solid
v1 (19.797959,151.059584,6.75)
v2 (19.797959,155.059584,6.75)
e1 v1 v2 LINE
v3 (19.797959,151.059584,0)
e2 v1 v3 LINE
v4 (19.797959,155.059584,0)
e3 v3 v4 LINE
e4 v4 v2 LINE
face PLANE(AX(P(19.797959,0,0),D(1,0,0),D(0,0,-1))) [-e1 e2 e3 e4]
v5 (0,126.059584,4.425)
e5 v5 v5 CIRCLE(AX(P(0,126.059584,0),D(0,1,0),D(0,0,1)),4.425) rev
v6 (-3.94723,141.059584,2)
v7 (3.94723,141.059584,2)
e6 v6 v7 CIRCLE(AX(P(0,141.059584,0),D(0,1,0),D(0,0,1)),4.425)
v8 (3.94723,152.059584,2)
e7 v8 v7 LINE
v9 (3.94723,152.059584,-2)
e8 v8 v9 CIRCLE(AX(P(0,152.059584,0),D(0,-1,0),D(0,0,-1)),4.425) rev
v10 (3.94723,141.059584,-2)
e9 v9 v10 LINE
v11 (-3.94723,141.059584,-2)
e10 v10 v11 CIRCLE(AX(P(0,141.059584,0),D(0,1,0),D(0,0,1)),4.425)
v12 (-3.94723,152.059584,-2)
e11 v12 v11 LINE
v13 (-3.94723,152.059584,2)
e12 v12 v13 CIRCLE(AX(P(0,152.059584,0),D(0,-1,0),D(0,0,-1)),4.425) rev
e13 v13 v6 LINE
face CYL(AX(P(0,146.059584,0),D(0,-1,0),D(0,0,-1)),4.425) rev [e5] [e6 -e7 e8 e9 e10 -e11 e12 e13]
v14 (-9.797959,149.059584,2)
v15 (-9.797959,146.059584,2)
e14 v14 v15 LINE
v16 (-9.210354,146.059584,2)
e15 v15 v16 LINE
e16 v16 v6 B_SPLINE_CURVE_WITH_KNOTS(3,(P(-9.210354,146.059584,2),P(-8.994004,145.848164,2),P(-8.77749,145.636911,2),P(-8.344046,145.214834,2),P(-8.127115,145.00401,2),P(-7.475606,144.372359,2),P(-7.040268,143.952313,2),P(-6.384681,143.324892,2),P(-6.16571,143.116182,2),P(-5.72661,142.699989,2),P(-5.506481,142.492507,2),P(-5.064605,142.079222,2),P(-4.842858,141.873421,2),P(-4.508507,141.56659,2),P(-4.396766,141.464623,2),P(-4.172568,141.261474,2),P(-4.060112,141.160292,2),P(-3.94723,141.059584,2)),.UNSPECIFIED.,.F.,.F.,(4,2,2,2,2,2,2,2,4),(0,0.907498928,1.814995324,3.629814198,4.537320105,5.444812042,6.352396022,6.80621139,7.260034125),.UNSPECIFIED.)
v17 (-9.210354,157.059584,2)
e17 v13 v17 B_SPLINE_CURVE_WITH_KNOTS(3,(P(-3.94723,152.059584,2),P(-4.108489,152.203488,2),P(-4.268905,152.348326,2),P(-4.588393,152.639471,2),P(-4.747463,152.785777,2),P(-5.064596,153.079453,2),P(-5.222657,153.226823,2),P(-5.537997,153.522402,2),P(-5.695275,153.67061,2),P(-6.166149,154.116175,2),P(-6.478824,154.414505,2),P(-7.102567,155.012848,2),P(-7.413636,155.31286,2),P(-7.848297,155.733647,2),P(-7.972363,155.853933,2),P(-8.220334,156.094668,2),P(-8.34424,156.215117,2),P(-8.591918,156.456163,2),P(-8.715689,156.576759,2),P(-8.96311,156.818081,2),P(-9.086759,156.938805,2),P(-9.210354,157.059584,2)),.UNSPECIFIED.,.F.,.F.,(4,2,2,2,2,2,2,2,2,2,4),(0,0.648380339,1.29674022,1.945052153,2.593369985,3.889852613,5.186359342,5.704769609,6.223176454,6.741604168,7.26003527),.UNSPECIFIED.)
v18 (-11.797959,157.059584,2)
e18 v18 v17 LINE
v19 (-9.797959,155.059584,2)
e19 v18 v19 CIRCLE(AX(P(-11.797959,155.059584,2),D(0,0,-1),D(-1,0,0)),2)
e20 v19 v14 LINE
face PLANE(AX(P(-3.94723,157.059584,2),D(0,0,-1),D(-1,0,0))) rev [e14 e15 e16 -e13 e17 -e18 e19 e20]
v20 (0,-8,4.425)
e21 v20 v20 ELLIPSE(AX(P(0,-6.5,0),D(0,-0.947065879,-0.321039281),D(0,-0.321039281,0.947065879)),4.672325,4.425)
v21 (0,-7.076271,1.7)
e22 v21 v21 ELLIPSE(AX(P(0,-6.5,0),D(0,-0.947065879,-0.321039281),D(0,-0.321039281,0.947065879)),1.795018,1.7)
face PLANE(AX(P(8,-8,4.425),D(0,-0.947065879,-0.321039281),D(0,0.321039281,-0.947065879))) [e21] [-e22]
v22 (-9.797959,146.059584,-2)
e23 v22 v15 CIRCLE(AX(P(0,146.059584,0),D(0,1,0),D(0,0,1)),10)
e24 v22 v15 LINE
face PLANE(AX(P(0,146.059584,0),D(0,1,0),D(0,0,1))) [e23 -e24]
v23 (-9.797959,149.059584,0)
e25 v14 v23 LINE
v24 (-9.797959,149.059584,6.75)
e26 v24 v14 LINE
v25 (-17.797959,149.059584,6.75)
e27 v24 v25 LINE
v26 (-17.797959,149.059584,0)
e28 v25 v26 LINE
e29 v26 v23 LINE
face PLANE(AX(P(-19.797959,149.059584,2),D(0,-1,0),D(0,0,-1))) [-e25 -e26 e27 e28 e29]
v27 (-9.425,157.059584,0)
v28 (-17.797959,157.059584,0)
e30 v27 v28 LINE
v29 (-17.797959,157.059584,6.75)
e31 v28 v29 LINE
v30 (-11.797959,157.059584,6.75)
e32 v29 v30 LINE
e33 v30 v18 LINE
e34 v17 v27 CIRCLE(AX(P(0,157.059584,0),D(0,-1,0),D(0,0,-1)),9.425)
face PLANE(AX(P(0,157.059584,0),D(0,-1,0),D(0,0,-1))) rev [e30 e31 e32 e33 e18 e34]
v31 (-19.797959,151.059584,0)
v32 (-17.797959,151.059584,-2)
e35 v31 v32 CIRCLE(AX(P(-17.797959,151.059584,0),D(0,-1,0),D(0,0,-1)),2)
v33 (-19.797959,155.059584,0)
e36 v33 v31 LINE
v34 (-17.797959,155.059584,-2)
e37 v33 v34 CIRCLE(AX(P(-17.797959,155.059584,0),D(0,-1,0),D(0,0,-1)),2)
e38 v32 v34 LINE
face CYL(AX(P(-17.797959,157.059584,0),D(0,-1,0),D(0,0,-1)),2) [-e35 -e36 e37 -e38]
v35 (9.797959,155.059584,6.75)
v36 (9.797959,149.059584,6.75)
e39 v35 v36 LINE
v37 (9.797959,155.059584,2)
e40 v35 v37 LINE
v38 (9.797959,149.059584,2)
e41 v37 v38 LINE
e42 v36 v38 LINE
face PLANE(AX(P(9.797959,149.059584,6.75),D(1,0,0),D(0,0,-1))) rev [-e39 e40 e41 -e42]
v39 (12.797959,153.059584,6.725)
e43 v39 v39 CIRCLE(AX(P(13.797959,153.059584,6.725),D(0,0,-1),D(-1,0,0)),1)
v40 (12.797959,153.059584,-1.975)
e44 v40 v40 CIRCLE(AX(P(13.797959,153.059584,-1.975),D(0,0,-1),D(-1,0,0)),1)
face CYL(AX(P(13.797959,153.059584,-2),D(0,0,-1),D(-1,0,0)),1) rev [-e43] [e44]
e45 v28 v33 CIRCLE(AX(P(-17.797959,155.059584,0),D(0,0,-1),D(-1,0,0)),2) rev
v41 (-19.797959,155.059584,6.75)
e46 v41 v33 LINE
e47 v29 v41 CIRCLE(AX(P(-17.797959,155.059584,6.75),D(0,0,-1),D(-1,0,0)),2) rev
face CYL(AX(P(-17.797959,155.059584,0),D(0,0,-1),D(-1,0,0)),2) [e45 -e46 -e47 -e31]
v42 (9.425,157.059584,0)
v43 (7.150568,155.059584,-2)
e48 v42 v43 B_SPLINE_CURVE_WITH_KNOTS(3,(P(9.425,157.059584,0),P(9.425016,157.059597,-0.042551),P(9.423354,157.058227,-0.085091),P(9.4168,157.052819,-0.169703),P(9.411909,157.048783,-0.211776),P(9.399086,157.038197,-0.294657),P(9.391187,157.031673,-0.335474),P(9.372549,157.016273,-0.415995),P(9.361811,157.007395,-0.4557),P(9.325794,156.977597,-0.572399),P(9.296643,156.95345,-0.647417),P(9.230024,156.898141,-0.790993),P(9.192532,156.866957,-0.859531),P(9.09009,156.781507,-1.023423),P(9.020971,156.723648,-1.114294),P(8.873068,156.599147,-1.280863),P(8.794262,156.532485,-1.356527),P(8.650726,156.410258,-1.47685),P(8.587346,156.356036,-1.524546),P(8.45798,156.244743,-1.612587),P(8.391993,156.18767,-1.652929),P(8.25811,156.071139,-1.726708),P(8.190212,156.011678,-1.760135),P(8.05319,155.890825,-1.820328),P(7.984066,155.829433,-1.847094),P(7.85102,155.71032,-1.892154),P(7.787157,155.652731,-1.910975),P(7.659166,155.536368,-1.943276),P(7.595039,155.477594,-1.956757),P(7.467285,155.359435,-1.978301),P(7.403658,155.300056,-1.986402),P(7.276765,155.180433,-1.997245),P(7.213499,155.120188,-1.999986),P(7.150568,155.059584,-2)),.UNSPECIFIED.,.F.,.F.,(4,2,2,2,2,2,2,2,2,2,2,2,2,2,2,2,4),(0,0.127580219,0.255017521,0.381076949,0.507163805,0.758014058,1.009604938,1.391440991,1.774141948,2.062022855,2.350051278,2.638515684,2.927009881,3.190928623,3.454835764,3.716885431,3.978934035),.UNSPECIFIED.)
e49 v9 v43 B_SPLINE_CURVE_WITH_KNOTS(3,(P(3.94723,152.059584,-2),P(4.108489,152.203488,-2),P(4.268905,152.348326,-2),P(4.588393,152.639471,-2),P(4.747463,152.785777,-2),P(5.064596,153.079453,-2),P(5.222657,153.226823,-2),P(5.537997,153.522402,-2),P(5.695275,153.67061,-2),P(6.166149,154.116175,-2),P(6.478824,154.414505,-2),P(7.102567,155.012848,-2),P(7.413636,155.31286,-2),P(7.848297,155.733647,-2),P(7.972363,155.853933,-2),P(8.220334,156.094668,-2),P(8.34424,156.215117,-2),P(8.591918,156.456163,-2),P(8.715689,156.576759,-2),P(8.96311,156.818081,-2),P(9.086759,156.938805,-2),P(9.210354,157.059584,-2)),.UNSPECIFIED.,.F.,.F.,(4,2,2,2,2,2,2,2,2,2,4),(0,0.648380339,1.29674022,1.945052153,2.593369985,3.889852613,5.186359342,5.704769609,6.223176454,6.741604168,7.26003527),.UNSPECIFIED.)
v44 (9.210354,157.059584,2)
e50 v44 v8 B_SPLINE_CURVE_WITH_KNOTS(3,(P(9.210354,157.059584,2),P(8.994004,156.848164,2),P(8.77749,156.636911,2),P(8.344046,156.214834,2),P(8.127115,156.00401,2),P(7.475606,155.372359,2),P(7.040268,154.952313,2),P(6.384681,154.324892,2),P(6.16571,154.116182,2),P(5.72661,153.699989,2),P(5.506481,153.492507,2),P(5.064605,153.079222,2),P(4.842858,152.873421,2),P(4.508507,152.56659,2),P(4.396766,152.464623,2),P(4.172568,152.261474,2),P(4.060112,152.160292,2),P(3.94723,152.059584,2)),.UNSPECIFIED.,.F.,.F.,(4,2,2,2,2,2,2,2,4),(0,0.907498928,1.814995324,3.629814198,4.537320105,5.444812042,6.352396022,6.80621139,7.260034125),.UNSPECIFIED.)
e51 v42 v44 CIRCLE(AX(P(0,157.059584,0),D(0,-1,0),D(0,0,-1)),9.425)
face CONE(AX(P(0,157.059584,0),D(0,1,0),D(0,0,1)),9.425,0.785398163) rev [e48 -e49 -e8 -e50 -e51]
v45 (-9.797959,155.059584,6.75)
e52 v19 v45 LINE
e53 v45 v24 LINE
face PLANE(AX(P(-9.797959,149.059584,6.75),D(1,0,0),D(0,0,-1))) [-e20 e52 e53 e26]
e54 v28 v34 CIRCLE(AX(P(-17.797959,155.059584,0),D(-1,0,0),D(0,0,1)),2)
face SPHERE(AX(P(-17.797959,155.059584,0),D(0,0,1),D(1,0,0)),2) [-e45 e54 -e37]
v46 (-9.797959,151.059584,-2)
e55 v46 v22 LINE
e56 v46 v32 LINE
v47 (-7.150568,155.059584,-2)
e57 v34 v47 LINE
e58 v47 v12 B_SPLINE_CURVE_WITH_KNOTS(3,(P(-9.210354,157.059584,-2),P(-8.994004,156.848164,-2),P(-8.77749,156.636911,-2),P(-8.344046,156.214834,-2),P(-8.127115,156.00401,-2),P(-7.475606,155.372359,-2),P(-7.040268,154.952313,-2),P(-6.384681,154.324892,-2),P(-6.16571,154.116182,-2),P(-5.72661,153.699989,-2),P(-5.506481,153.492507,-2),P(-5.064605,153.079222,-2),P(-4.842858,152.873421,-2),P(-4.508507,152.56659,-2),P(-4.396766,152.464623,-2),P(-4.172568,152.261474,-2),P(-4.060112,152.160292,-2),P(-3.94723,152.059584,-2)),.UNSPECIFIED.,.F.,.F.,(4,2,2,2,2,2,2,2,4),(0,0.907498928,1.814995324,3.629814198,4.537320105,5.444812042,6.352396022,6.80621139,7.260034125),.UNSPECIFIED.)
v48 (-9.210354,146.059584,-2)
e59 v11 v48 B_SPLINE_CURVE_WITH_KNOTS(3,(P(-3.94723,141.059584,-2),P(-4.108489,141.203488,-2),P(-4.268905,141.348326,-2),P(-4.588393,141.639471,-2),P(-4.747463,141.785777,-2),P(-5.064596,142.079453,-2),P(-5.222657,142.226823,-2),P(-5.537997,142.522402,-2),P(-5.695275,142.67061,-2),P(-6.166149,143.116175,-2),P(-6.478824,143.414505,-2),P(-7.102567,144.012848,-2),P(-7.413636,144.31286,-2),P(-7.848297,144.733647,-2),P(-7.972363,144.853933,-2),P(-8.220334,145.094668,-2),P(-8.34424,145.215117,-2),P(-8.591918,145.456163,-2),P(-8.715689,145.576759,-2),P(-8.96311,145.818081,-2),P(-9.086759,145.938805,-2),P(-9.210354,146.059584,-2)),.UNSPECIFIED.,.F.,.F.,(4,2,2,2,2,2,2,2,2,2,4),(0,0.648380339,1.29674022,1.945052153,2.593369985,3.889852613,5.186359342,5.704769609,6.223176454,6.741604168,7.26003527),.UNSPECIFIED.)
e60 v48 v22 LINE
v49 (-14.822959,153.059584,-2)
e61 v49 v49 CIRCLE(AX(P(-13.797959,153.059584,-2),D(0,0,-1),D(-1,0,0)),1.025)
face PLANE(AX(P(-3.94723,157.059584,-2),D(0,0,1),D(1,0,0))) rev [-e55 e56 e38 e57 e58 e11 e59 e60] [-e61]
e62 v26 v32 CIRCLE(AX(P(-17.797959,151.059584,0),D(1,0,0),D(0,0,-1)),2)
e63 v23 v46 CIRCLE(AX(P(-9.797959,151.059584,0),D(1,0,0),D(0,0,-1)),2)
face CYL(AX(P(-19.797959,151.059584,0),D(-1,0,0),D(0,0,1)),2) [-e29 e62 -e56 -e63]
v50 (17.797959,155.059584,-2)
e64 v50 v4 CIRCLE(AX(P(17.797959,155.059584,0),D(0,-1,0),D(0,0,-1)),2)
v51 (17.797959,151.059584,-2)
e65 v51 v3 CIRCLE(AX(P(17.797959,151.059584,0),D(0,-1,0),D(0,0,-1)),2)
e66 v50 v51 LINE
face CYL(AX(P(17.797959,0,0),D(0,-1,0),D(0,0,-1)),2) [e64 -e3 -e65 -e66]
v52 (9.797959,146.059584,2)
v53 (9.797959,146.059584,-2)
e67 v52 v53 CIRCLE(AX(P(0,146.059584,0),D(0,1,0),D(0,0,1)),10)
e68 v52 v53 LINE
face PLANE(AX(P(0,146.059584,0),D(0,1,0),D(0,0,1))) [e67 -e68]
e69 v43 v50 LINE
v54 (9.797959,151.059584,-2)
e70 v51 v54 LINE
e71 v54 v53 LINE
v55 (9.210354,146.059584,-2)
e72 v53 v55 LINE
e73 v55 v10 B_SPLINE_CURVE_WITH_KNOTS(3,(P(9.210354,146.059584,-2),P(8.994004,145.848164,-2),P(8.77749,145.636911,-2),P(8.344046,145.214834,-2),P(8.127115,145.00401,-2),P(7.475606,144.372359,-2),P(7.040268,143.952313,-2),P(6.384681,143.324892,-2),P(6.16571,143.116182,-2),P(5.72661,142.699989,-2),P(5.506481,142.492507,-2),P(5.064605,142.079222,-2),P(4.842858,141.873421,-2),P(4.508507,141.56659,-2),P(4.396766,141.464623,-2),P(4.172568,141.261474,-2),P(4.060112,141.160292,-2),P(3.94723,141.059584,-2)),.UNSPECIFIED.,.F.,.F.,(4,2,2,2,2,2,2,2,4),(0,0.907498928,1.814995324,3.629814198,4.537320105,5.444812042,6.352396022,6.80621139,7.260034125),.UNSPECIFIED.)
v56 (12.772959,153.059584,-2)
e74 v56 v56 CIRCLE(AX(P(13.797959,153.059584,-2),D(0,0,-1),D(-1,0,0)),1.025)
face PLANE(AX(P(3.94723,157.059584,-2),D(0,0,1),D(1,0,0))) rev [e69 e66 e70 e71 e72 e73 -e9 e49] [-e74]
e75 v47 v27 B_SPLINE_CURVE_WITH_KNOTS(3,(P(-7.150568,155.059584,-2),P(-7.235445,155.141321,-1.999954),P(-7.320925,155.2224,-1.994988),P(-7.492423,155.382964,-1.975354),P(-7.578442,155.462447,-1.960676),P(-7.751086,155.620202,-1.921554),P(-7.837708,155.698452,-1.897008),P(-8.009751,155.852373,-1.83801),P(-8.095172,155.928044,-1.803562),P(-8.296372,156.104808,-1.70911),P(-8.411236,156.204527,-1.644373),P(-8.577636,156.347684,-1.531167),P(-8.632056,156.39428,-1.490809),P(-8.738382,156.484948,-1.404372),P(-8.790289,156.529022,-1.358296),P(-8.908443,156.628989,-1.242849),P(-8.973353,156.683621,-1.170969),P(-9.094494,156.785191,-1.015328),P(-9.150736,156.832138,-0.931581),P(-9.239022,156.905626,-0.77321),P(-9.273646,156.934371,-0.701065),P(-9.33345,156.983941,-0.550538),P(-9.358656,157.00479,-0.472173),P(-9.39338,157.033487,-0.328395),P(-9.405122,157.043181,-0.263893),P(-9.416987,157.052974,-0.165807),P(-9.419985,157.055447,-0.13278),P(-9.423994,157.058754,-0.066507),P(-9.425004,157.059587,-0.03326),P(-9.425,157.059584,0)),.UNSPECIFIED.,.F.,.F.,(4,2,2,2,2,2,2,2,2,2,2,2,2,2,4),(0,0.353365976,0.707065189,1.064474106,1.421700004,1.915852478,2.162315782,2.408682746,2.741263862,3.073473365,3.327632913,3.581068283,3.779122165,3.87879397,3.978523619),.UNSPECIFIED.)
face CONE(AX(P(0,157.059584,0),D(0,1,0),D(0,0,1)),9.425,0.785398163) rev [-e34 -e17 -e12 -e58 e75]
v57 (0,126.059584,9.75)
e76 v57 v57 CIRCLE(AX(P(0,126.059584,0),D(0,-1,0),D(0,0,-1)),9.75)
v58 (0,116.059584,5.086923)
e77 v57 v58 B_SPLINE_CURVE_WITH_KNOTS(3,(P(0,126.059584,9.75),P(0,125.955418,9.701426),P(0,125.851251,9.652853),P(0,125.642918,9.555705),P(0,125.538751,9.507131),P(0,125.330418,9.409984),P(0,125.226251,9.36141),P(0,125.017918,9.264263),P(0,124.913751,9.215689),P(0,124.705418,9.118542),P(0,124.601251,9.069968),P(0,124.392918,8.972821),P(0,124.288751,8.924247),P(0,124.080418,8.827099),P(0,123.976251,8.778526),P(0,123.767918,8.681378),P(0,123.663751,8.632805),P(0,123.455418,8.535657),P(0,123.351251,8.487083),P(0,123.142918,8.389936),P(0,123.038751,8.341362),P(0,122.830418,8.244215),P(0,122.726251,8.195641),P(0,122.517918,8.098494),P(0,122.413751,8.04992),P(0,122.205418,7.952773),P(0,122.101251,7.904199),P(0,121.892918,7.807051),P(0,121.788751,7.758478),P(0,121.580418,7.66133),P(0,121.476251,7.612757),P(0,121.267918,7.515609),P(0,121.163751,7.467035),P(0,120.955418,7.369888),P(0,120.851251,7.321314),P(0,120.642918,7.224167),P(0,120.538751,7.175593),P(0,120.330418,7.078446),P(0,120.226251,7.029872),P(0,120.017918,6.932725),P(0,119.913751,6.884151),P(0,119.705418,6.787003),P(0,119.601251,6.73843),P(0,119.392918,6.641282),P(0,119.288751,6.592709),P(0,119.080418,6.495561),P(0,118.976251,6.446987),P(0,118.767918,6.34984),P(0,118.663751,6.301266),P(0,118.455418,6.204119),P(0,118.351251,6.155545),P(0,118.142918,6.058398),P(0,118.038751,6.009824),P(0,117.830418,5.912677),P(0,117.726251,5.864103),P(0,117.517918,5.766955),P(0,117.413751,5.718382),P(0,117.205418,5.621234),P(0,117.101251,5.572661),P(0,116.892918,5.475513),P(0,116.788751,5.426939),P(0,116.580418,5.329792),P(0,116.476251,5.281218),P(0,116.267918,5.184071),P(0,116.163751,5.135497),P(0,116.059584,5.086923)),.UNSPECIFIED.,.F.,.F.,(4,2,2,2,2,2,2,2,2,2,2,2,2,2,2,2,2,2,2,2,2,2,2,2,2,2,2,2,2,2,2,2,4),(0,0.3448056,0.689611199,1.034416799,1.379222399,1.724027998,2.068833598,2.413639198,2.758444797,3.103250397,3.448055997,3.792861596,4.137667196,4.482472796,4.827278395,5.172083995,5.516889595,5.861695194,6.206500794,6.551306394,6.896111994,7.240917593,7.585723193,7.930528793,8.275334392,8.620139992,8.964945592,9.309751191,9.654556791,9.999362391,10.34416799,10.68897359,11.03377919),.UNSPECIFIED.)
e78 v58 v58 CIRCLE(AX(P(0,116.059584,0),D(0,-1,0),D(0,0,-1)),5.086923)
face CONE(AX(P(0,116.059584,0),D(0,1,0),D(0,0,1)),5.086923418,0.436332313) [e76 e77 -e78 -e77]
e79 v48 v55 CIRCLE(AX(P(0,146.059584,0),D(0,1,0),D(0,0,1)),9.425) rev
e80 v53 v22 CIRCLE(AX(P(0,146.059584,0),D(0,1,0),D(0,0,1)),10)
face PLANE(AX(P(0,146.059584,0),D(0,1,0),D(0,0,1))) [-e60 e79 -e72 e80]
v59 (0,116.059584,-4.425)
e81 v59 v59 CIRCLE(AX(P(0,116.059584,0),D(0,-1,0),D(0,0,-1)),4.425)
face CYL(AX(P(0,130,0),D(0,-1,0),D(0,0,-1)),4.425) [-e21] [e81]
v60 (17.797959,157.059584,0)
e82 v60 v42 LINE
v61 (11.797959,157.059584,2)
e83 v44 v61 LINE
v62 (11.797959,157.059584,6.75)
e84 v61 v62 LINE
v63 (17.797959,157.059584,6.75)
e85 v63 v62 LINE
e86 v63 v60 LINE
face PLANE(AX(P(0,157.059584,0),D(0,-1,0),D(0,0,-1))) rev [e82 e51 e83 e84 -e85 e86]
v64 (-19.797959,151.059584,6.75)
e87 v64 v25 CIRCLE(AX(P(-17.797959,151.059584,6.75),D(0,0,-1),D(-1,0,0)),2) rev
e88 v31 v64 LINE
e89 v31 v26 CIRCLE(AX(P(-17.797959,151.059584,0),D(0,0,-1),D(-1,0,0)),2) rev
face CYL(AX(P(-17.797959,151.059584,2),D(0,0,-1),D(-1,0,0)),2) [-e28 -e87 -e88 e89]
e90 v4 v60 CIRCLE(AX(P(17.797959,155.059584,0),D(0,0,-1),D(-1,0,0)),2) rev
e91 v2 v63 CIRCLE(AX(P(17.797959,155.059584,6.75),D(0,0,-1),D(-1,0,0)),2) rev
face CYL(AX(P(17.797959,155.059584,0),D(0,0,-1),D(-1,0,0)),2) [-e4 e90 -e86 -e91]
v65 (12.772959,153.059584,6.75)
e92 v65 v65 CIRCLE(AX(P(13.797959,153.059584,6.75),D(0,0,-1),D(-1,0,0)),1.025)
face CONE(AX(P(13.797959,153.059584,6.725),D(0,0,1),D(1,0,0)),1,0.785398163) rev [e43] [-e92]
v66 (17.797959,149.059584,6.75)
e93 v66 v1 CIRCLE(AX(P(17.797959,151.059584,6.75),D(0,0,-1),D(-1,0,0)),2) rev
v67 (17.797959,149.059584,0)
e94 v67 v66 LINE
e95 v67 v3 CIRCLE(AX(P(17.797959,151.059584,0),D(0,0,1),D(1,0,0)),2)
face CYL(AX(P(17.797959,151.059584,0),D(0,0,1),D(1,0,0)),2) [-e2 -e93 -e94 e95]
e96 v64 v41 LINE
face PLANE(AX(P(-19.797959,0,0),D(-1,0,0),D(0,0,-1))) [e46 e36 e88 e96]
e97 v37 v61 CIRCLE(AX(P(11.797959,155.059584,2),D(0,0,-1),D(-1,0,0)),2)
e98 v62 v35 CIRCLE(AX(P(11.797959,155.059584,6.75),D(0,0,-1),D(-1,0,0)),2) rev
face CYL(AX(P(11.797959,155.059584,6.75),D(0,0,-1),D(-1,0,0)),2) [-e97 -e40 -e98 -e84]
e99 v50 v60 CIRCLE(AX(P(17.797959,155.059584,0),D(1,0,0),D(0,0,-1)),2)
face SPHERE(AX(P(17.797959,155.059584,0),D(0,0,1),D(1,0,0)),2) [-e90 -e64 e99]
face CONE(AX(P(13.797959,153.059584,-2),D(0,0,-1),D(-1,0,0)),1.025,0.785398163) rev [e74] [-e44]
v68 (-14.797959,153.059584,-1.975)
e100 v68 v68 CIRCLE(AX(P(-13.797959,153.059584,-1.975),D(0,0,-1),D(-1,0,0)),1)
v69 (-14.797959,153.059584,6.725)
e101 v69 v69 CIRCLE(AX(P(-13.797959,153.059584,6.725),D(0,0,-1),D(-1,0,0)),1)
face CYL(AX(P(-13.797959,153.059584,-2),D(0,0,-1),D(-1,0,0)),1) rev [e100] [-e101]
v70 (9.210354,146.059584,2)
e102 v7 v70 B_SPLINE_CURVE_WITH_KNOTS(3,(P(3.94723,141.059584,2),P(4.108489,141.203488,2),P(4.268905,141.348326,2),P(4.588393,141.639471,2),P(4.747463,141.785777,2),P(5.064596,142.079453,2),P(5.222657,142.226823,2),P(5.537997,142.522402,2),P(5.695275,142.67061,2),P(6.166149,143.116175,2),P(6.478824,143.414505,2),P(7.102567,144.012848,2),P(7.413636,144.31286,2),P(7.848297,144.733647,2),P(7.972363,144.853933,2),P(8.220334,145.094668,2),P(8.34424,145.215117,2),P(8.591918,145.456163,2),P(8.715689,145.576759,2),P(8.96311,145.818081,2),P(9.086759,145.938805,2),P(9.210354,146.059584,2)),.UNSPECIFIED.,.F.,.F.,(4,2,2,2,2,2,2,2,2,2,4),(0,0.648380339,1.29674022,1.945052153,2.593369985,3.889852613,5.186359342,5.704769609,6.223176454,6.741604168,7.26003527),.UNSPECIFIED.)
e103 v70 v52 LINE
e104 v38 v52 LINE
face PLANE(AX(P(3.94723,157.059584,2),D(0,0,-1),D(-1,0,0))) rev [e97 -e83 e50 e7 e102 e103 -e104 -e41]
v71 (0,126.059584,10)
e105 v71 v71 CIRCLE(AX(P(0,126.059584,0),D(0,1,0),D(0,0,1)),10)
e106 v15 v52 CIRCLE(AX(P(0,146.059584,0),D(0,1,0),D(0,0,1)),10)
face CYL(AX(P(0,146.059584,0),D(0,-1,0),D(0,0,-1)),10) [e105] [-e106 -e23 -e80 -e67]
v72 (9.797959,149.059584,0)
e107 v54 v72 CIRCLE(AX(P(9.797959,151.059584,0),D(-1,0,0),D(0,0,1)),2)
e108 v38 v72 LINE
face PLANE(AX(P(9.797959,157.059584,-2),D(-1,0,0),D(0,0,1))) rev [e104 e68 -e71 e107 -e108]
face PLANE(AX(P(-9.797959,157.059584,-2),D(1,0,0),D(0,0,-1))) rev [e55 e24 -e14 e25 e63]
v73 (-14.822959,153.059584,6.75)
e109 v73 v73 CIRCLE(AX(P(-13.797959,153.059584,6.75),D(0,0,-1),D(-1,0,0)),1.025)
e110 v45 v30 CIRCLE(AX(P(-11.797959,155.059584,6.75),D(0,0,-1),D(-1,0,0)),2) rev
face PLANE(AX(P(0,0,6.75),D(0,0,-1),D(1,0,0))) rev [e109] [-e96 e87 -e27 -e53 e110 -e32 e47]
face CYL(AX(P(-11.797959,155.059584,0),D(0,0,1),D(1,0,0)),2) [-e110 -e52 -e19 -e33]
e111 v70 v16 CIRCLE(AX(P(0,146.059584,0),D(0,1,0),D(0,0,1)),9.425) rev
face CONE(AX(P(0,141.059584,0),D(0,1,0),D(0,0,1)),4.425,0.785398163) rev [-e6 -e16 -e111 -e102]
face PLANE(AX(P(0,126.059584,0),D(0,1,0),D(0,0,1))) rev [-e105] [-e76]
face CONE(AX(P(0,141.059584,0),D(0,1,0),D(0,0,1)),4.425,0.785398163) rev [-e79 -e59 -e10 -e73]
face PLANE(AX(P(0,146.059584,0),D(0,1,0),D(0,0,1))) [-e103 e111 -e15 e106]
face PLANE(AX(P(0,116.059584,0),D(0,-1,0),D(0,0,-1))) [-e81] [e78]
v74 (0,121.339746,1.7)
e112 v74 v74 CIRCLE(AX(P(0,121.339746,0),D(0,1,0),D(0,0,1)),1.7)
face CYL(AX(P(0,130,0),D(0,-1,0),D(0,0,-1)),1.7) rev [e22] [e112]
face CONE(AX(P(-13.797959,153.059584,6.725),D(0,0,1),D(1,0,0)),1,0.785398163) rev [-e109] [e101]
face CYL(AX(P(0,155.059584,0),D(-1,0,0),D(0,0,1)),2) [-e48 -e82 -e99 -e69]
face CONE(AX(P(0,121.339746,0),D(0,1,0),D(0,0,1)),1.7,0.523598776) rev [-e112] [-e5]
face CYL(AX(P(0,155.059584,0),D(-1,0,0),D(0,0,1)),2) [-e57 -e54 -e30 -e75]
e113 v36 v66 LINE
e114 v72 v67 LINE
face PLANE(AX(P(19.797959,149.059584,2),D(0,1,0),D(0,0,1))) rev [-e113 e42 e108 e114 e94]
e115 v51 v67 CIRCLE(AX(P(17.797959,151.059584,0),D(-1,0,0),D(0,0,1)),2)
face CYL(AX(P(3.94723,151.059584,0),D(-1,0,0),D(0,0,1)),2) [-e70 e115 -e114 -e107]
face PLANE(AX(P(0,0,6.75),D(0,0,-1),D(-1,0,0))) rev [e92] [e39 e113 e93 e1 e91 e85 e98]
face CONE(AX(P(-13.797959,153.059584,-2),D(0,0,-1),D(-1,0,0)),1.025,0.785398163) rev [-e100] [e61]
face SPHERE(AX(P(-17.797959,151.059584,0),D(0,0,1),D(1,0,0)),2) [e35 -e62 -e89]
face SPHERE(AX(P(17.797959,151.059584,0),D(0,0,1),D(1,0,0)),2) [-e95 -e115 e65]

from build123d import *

# Parameters (mm, degrees)
SKETCH1_R                      = 4.425000000000001
SKETCH1_R_2                    = 1.7
BOSS_EXTRUDE1_DEPTH            = 130
CHAMFER1_SIZE                  = 8.660254038
CHAMFER1_SIZE_2                = 5
SKETCH2_R                      = 10
SKETCH2_R_2                    = 4.425000000000001
BOSS_EXTRUDE2_DEPTH            = 20
BOSS_EXTRUDE5_DEPTH            = 11
BOSS_EXTRUDE6_DEPTH            = 10
SKETCH13_W                     = 10.000000000000002
SKETCH13_H                     = 8
BOSS_EXTRUDE7_DEPTH            = 4.75
FILLET1_R                      = 2
FILLET1_OF_MIRROR1_R           = 2
CHAMFER4_SIZE                  = 5
CHAMFER2_SIZE                  = 5
BOSS_EXTRUDE3_START            = 10
SKETCH7_R                      = 9.75
SKETCH7_R_2                    = 4.425000000000001
BOSS_EXTRUDE3_DEPTH            = 10
CHAMFER3_SIZE2                 = 4.663076582
CHAMFER3_SIZE                  = 10
BOSS_EXTRUDE4_START            = 8
SKETCH8_R                      = 4.425000000000001
SKETCH8_R_2                    = 1.7
BOSS_EXTRUDE4_DEPTH            = 8
CUT_EXTRUDE1_DEPTH             = 8
CUT_EXTRUDE1_DEPTH_BACK        = 8
FILLET2_R                      = 2
F_2_0MM_DOWEL_HOLE1_AT_2_COUNT = 2
F_2_0MM_DOWEL_HOLE1_AT_2_PITCH = 27.595917942265427


# Some blends are built 0.0001 mm under size
with BuildPart() as part:
    # Sketch1 → Boss-Extrude1 (new body)
    with BuildSketch(Plane(origin=(0, 0, 0), x_dir=(1, 0, 0), z_dir=(0, 1, 0))):
        with Locations(Location((0, 0, 0), (0, 0, 270))):
            Circle(SKETCH1_R)
        with Locations(Location((0, 0, 0), (0, 0, 270))):
            Circle(SKETCH1_R_2, mode=Mode.SUBTRACT)
    extrude(amount=BOSS_EXTRUDE1_DEPTH)

    # Chamfer1
    # the kernel refuses this chamfer: 8.660254038, 5 mm, written as the material it takes off along each edge
    with BuildSketch(Plane(origin=(0, 130, 0), x_dir=(-1.8e-16, 0, 1), z_dir=(-1, 0, -1.8e-16))) as chamfer1_piece_1:
        Polygon((1.7, -CHAMFER1_SIZE), (1.7 + CHAMFER1_SIZE_2, 0), (1.7, 0), align=None)
    revolve(axis=Axis((0, 130, 0), (0, 1, 0)), mode=Mode.SUBTRACT)



with BuildPart() as body_2:
    # Sketch2 → Boss-Extrude2 (new body)
    with BuildSketch(Plane(origin=(0, 126.05958441278065, 0), x_dir=(1, 0, 0), z_dir=(0, 1, 0))):
        with Locations(Location((0, 0, 0), (0, 0, 270))):
            Circle(SKETCH2_R)
        with Locations(Location((0, 0, 0), (0, 0, 270))):
            Circle(SKETCH2_R_2, mode=Mode.SUBTRACT)
    extrude(amount=BOSS_EXTRUDE2_DEPTH)

    # Sketch10 → Boss-Extrude5 (add)
    with BuildSketch(Plane(origin=(0, 146.05958441278062, 0), x_dir=(1, 0, 0), z_dir=(0, 1, 0))):
        with BuildLine():
            Line((-3.9472300414341213, -1.9999999999999991), (-9.797958971132713, -1.9999999999999987))
            Line((-9.797958971132713, -1.9999999999999987), (-9.797958971132713, 1.9999999999999987))
            Line((-9.797958971132713, 1.9999999999999987), (-3.9472300414341213, 2.0000000000000004))
            ThreePointArc((-3.9472300414341213, 2.0000000000000004), (-4.425000000000002, 1.42e-15), (-3.9472300414341213, -1.9999999999999991))
        make_face()
        with BuildLine():
            Line((3.9472300414341213, 2.0000000000000004), (9.797958971132713, 1.9999999999999987))
            Line((9.797958971132713, 1.9999999999999987), (9.797958971132713, -1.9999999999999987))
            Line((9.797958971132713, -1.9999999999999987), (3.9472300414341213, -1.9999999999999991))
            ThreePointArc((3.9472300414341213, -1.9999999999999991), (4.425000000000002, 4.9e-16), (3.9472300414341213, 2.0000000000000004))
        make_face()
    boss_extrude5 = extrude(amount=BOSS_EXTRUDE5_DEPTH)

    # Sketch11 → Boss-Extrude6 (add)
    with BuildSketch(Plane(origin=(9.797958971132713, 0, 0), x_dir=(0, 0, -1), z_dir=(1, 0, 0))):
        Polygon((-2.0000000000000004, 157.05958441278065), (2.0000000000000004, 157.05958441278065), (2.0000000000000013, 149.05958441278065), (-1.9999999999999996, 149.05958441278065), align=None)
    boss_extrude6 = extrude(amount=BOSS_EXTRUDE6_DEPTH)

    # Sketch13 → Boss-Extrude7 (add)
    with BuildSketch(Plane.XY.offset(1.9999999999999996)):
        with Locations((14.797958971132715, 153.05958441278065)):
            Rectangle(SKETCH13_W, SKETCH13_H)
    boss_extrude7 = extrude(amount=BOSS_EXTRUDE7_DEPTH)

    # Fillet1
    fillet1_edges = [body_2.edges().sort_by_distance(p)[0] for p in [
        (19.797958971132715, 149.05958441278065, 2.374999999999999),
        (19.797958971132715, 157.05958441278065, 2.375),
        (9.797958971132713, 157.05958441278065, 4.375),
    ]]
    fillet(fillet1_edges, radius=FILLET1_R)

    # Mirror1: Boss-Extrude5, Boss-Extrude6, Boss-Extrude7 across plane
    add(boss_extrude5.mirror(Plane(origin=(0, 0, 0), x_dir=(0, 0, 1), z_dir=(1, 0, 0))))
    add(boss_extrude6.mirror(Plane(origin=(0, 0, 0), x_dir=(0, 0, 1), z_dir=(1, 0, 0))))
    add(boss_extrude7.mirror(Plane(origin=(0, 0, 0), x_dir=(0, 0, 1), z_dir=(1, 0, 0))))

    # Fillet1 of Mirror1
    fillet1_of_mirror1_edges = [body_2.edges().sort_by_distance(p)[0] for p in [
        (-19.797958971132715, 149.05958441278065, 2.374999999999999),
        (-19.797958971132715, 157.05958441278065, 2.375),
        (-9.797958971132713, 157.05958441278065, 4.375),
    ]]
    fillet(fillet1_of_mirror1_edges, radius=FILLET1_OF_MIRROR1_R)

    # Chamfer4
    chamfer4_edges = [body_2.edges().sort_by_distance(p)[0] for p in [
        (-4.425000000000001, 157.05958441278062, -8.9e-16),
        (4.425000000000001, 157.05958441278062, -4.4e-16),
    ]]
    chamfer(chamfer4_edges, length=CHAMFER4_SIZE)

    # Chamfer2
    # the kernel refuses this chamfer: 5 mm, written as the material it takes off along each edge
    with BuildSketch(Plane(origin=(0, 146.05958441278065, 0), x_dir=(-1.8e-16, 0, 1), z_dir=(-1, 0, -1.8e-16))) as chamfer2_piece_1_section:
        Polygon((4.425000000000001 + CHAMFER2_SIZE, 0), (4.425000000000001, -CHAMFER2_SIZE), (4.425000000000001, 0), align=None)
    chamfer2_piece_1 = revolve(axis=Axis((0, 146.05958441278065, 0), (0, 1, 0)), revolution_arc=229.65559156034735, mode=Mode.PRIVATE)
    chamfer2_piece_1 = split(chamfer2_piece_1, bisect_by=Plane(origin=(3.4962989060628606, 144.5390563337766, 1.9999999999999991), z_dir=(8e-17, 0, 1)), keep=Keep.TOP, mode=Mode.PRIVATE)
    add(chamfer2_piece_1, mode=Mode.SUBTRACT)
    with BuildSketch(Plane(origin=(0, 146.05958441278065, 0), x_dir=(-1.8e-16, 0, 1), z_dir=(-1, 0, -1.8e-16))) as chamfer2_piece_2_section:
        Polygon((4.425000000000001 + CHAMFER2_SIZE, 0), (4.425000000000001, -CHAMFER2_SIZE), (4.425000000000001, 0), align=None)
    chamfer2_piece_2 = revolve(axis=Axis((0, 146.05958441278065, 0), (0, 1, 0)), revolution_arc=229.65559156034735, mode=Mode.PRIVATE)
    chamfer2_piece_2 = split(chamfer2_piece_2, bisect_by=Plane(origin=(0.9948048927279718, 144.5258061794418, -2.0000000000000013), z_dir=(3e-16, 0, -1)), keep=Keep.TOP, mode=Mode.PRIVATE)
    add(chamfer2_piece_2, mode=Mode.SUBTRACT)
    with BuildSketch(Plane(origin=(0, 146.05958441278065, 0), x_dir=(0.00314158748587874, 0, 0.9999950652018582), z_dir=(-0.9999950652018582, 0, 0.00314158748587874))) as chamfer2_piece_3_section:
        Polygon((4.425000000000001, -CHAMFER2_SIZE), (4.425000000000001 + CHAMFER2_SIZE, 0), (4.425000000000001, 0), align=None)
    chamfer2_piece_3 = revolve(axis=Axis((0, 146.05958441278065, 0), (0, 1, 0)), revolution_arc=359.64000000000004, mode=Mode.PRIVATE)
    chamfer2_piece_3 = split(chamfer2_piece_3, bisect_by=Plane(origin=(3.5051865740381585, 144.53913826571085, 1.9999999999999998), z_dir=(-8e-17, 0, 1)), keep=Keep.TOP, mode=Mode.PRIVATE)
    add(chamfer2_piece_3, mode=Mode.SUBTRACT)
    with BuildSketch(Plane(origin=(0, 146.05958441278065, 0), x_dir=(0.00314158748587874, 0, 0.9999950652018582), z_dir=(-0.9999950652018582, 0, 0.00314158748587874))) as chamfer2_piece_4_section:
        Polygon((4.425000000000001, -CHAMFER2_SIZE), (4.425000000000001 + CHAMFER2_SIZE, 0), (4.425000000000001, 0), align=None)
    chamfer2_piece_4 = revolve(axis=Axis((0, 146.05958441278065, 0), (0, 1, 0)), revolution_arc=359.64000000000004, mode=Mode.PRIVATE)
    chamfer2_piece_4 = split(chamfer2_piece_4, bisect_by=Plane(origin=(-1.19549e-12, 144.53905633375842, -2.0000000000000018), z_dir=(-3e-16, 0, -1)), keep=Keep.TOP, mode=Mode.PRIVATE)
    add(chamfer2_piece_4, mode=Mode.SUBTRACT)
    with BuildSketch(Plane(origin=(0, 146.05958441278065, 0), x_dir=(0.762166791053464, 0, -0.6473807091775792), z_dir=(0.6473807091775792, 0, 0.762166791053464))) as chamfer2_piece_5_section:
        Polygon((4.425000000000001 + CHAMFER2_SIZE, 0), (4.425000000000001, -CHAMFER2_SIZE), (4.425000000000001, 0), align=None)
    chamfer2_piece_5 = revolve(axis=Axis((0, 146.05958441278065, 0), (0, 1, 0)), revolution_arc=229.6555915603473, mode=Mode.PRIVATE)
    chamfer2_piece_5 = split(chamfer2_piece_5, bisect_by=Plane(origin=(-0.9948048927279931, 144.52580617944176, -2.0000000000000013), z_dir=(-3e-16, 0, -1)), keep=Keep.TOP, mode=Mode.PRIVATE)
    add(chamfer2_piece_5, mode=Mode.SUBTRACT)
    with BuildSketch(Plane(origin=(0, 146.05958441278065, 0), x_dir=(0.762166791053464, 0, -0.6473807091775792), z_dir=(0.6473807091775792, 0, 0.762166791053464))) as chamfer2_piece_6_section:
        Polygon((4.425000000000001 + CHAMFER2_SIZE, 0), (4.425000000000001, -CHAMFER2_SIZE), (4.425000000000001, 0), align=None)
    chamfer2_piece_6 = revolve(axis=Axis((0, 146.05958441278065, 0), (0, 1, 0)), revolution_arc=229.6555915603473, mode=Mode.PRIVATE)
    chamfer2_piece_6 = split(chamfer2_piece_6, bisect_by=Plane(origin=(-3.496298906062748, 144.53905633377667, 1.9999999999999991), z_dir=(-8e-17, 0, 1)), keep=Keep.TOP, mode=Mode.PRIVATE)
    add(chamfer2_piece_6, mode=Mode.SUBTRACT)


with BuildPart() as part_1:
    add(part.part)

    add(body_2.part)  # Boss-Extrude3 merges body 2
    # Sketch7 → Boss-Extrude3 (add)
    with BuildSketch(Plane.XZ.offset(-126.05958441278065).offset(BOSS_EXTRUDE3_START)):
        with Locations(Location((0, 0, 0), (0, 0, 270))):
            Circle(SKETCH7_R)
        with Locations(Location((0, 0, 0), (0, 0, 270))):
            Circle(SKETCH7_R_2, mode=Mode.SUBTRACT)
    extrude(amount=-BOSS_EXTRUDE3_DEPTH)

    # Chamfer3
    chamfer3_edges = [part_1.edges().sort_by_distance(p)[0] for p in [
        (2.99e-15, 116.05958441278065, 9.75),
    ]]
    chamfer3_side = [part_1.faces().sort_by_distance(p)[0] for p in [
        (2.99e-15, 116.15284594441165, 9.75),
    ]]
    chamfer(chamfer3_edges, length=CHAMFER3_SIZE - 0.0001, length2=CHAMFER3_SIZE2 - 0.0001, reference=chamfer3_side[0])  # a hair under: the kernel refuses the full size

    # Sketch8 → Boss-Extrude4 (add)
    with BuildSketch(Plane.XZ.offset(BOSS_EXTRUDE4_START)):
        with Locations(Location((0, 0, 0), (0, 0, 270))):
            Circle(SKETCH8_R)
        with Locations(Location((0, 0, 0), (0, 0, 270))):
            Circle(SKETCH8_R_2, mode=Mode.SUBTRACT)
    extrude(amount=-BOSS_EXTRUDE4_DEPTH)

    # Sketch9 → Cut-Extrude1 (cut, two sides: drawn at the far end of the back side and taken through both)
    with BuildSketch(Plane(origin=(0, 0, 0), x_dir=(0, 0, -1), z_dir=(1, 0, 0)).offset(-CUT_EXTRUDE1_DEPTH_BACK)):
        Polygon((-4.425000000000001, -8.000000000000007), (4.425000000000001, -5.000000000000007), (4.425000000000001, -8.000000000000007), align=None)
    extrude(amount=CUT_EXTRUDE1_DEPTH + CUT_EXTRUDE1_DEPTH_BACK, mode=Mode.SUBTRACT)

    # Fillet2
    fillet2_edges = [part_1.edges().sort_by_distance(p)[0] for p in [
        (13.797958971132715, 149.05958441278065, -2.0000000000000013),
        (19.21217253350581, 149.64537085040755, -1.9999999999999964),
        (19.797958971132715, 153.05958441278062, -2.000000000000001),
        (19.21217253350581, 156.47379797515373, -1.9999999999999964),
        (-13.797958971132715, 149.05958441278065, -2.0000000000000013),
        (-19.21217253350581, 149.64537085040755, -1.9999999999999964),
        (-19.797958971132715, 153.05958441278062, -2.000000000000001),
        (-19.21217253350581, 156.47379797515373, -1.9999999999999964),
        (13.504156599424196, 157.05958441278062, -2),
        (-13.504156599424196, 157.05958441278065, -2.0000000000000004),
    ]]
    fillet(fillet2_edges, radius=FILLET2_R)

    # Sketch17 → Ø2.0mm Dowel Hole1 (revolve, cut)
    with BuildSketch(Plane(origin=(-13.797958971132712, 153.05958441278065, -1.9999999999999978), x_dir=(0, 1, 0), z_dir=(1, 0, -3e-16))):
        Polygon((0, 0), (-2.14e-15, 8.749999999999998), (1.0249999999999977, 8.749999999999998), (0.9999999999999983, 8.724999999999996), (0.9999999999999993, 0.02500000000000072), (1.025, 0), align=None)
    f_2_0mm_dowel_hole1 = revolve(axis=Axis((-13.797958971132713, 153.05958441278065, -8.349999999999989), (3e-16, 0, 1)), mode=Mode.SUBTRACT)

    # Ø2.0mm Dowel Hole1 at 2: Ø2.0mm Dowel Hole1 ×2
    with Locations(*[(i * F_2_0MM_DOWEL_HOLE1_AT_2_PITCH, 0, 0) for i in range(1, F_2_0MM_DOWEL_HOLE1_AT_2_COUNT)]):
        add(f_2_0mm_dowel_hole1, mode=Mode.SUBTRACT)


solid = part_1.part
